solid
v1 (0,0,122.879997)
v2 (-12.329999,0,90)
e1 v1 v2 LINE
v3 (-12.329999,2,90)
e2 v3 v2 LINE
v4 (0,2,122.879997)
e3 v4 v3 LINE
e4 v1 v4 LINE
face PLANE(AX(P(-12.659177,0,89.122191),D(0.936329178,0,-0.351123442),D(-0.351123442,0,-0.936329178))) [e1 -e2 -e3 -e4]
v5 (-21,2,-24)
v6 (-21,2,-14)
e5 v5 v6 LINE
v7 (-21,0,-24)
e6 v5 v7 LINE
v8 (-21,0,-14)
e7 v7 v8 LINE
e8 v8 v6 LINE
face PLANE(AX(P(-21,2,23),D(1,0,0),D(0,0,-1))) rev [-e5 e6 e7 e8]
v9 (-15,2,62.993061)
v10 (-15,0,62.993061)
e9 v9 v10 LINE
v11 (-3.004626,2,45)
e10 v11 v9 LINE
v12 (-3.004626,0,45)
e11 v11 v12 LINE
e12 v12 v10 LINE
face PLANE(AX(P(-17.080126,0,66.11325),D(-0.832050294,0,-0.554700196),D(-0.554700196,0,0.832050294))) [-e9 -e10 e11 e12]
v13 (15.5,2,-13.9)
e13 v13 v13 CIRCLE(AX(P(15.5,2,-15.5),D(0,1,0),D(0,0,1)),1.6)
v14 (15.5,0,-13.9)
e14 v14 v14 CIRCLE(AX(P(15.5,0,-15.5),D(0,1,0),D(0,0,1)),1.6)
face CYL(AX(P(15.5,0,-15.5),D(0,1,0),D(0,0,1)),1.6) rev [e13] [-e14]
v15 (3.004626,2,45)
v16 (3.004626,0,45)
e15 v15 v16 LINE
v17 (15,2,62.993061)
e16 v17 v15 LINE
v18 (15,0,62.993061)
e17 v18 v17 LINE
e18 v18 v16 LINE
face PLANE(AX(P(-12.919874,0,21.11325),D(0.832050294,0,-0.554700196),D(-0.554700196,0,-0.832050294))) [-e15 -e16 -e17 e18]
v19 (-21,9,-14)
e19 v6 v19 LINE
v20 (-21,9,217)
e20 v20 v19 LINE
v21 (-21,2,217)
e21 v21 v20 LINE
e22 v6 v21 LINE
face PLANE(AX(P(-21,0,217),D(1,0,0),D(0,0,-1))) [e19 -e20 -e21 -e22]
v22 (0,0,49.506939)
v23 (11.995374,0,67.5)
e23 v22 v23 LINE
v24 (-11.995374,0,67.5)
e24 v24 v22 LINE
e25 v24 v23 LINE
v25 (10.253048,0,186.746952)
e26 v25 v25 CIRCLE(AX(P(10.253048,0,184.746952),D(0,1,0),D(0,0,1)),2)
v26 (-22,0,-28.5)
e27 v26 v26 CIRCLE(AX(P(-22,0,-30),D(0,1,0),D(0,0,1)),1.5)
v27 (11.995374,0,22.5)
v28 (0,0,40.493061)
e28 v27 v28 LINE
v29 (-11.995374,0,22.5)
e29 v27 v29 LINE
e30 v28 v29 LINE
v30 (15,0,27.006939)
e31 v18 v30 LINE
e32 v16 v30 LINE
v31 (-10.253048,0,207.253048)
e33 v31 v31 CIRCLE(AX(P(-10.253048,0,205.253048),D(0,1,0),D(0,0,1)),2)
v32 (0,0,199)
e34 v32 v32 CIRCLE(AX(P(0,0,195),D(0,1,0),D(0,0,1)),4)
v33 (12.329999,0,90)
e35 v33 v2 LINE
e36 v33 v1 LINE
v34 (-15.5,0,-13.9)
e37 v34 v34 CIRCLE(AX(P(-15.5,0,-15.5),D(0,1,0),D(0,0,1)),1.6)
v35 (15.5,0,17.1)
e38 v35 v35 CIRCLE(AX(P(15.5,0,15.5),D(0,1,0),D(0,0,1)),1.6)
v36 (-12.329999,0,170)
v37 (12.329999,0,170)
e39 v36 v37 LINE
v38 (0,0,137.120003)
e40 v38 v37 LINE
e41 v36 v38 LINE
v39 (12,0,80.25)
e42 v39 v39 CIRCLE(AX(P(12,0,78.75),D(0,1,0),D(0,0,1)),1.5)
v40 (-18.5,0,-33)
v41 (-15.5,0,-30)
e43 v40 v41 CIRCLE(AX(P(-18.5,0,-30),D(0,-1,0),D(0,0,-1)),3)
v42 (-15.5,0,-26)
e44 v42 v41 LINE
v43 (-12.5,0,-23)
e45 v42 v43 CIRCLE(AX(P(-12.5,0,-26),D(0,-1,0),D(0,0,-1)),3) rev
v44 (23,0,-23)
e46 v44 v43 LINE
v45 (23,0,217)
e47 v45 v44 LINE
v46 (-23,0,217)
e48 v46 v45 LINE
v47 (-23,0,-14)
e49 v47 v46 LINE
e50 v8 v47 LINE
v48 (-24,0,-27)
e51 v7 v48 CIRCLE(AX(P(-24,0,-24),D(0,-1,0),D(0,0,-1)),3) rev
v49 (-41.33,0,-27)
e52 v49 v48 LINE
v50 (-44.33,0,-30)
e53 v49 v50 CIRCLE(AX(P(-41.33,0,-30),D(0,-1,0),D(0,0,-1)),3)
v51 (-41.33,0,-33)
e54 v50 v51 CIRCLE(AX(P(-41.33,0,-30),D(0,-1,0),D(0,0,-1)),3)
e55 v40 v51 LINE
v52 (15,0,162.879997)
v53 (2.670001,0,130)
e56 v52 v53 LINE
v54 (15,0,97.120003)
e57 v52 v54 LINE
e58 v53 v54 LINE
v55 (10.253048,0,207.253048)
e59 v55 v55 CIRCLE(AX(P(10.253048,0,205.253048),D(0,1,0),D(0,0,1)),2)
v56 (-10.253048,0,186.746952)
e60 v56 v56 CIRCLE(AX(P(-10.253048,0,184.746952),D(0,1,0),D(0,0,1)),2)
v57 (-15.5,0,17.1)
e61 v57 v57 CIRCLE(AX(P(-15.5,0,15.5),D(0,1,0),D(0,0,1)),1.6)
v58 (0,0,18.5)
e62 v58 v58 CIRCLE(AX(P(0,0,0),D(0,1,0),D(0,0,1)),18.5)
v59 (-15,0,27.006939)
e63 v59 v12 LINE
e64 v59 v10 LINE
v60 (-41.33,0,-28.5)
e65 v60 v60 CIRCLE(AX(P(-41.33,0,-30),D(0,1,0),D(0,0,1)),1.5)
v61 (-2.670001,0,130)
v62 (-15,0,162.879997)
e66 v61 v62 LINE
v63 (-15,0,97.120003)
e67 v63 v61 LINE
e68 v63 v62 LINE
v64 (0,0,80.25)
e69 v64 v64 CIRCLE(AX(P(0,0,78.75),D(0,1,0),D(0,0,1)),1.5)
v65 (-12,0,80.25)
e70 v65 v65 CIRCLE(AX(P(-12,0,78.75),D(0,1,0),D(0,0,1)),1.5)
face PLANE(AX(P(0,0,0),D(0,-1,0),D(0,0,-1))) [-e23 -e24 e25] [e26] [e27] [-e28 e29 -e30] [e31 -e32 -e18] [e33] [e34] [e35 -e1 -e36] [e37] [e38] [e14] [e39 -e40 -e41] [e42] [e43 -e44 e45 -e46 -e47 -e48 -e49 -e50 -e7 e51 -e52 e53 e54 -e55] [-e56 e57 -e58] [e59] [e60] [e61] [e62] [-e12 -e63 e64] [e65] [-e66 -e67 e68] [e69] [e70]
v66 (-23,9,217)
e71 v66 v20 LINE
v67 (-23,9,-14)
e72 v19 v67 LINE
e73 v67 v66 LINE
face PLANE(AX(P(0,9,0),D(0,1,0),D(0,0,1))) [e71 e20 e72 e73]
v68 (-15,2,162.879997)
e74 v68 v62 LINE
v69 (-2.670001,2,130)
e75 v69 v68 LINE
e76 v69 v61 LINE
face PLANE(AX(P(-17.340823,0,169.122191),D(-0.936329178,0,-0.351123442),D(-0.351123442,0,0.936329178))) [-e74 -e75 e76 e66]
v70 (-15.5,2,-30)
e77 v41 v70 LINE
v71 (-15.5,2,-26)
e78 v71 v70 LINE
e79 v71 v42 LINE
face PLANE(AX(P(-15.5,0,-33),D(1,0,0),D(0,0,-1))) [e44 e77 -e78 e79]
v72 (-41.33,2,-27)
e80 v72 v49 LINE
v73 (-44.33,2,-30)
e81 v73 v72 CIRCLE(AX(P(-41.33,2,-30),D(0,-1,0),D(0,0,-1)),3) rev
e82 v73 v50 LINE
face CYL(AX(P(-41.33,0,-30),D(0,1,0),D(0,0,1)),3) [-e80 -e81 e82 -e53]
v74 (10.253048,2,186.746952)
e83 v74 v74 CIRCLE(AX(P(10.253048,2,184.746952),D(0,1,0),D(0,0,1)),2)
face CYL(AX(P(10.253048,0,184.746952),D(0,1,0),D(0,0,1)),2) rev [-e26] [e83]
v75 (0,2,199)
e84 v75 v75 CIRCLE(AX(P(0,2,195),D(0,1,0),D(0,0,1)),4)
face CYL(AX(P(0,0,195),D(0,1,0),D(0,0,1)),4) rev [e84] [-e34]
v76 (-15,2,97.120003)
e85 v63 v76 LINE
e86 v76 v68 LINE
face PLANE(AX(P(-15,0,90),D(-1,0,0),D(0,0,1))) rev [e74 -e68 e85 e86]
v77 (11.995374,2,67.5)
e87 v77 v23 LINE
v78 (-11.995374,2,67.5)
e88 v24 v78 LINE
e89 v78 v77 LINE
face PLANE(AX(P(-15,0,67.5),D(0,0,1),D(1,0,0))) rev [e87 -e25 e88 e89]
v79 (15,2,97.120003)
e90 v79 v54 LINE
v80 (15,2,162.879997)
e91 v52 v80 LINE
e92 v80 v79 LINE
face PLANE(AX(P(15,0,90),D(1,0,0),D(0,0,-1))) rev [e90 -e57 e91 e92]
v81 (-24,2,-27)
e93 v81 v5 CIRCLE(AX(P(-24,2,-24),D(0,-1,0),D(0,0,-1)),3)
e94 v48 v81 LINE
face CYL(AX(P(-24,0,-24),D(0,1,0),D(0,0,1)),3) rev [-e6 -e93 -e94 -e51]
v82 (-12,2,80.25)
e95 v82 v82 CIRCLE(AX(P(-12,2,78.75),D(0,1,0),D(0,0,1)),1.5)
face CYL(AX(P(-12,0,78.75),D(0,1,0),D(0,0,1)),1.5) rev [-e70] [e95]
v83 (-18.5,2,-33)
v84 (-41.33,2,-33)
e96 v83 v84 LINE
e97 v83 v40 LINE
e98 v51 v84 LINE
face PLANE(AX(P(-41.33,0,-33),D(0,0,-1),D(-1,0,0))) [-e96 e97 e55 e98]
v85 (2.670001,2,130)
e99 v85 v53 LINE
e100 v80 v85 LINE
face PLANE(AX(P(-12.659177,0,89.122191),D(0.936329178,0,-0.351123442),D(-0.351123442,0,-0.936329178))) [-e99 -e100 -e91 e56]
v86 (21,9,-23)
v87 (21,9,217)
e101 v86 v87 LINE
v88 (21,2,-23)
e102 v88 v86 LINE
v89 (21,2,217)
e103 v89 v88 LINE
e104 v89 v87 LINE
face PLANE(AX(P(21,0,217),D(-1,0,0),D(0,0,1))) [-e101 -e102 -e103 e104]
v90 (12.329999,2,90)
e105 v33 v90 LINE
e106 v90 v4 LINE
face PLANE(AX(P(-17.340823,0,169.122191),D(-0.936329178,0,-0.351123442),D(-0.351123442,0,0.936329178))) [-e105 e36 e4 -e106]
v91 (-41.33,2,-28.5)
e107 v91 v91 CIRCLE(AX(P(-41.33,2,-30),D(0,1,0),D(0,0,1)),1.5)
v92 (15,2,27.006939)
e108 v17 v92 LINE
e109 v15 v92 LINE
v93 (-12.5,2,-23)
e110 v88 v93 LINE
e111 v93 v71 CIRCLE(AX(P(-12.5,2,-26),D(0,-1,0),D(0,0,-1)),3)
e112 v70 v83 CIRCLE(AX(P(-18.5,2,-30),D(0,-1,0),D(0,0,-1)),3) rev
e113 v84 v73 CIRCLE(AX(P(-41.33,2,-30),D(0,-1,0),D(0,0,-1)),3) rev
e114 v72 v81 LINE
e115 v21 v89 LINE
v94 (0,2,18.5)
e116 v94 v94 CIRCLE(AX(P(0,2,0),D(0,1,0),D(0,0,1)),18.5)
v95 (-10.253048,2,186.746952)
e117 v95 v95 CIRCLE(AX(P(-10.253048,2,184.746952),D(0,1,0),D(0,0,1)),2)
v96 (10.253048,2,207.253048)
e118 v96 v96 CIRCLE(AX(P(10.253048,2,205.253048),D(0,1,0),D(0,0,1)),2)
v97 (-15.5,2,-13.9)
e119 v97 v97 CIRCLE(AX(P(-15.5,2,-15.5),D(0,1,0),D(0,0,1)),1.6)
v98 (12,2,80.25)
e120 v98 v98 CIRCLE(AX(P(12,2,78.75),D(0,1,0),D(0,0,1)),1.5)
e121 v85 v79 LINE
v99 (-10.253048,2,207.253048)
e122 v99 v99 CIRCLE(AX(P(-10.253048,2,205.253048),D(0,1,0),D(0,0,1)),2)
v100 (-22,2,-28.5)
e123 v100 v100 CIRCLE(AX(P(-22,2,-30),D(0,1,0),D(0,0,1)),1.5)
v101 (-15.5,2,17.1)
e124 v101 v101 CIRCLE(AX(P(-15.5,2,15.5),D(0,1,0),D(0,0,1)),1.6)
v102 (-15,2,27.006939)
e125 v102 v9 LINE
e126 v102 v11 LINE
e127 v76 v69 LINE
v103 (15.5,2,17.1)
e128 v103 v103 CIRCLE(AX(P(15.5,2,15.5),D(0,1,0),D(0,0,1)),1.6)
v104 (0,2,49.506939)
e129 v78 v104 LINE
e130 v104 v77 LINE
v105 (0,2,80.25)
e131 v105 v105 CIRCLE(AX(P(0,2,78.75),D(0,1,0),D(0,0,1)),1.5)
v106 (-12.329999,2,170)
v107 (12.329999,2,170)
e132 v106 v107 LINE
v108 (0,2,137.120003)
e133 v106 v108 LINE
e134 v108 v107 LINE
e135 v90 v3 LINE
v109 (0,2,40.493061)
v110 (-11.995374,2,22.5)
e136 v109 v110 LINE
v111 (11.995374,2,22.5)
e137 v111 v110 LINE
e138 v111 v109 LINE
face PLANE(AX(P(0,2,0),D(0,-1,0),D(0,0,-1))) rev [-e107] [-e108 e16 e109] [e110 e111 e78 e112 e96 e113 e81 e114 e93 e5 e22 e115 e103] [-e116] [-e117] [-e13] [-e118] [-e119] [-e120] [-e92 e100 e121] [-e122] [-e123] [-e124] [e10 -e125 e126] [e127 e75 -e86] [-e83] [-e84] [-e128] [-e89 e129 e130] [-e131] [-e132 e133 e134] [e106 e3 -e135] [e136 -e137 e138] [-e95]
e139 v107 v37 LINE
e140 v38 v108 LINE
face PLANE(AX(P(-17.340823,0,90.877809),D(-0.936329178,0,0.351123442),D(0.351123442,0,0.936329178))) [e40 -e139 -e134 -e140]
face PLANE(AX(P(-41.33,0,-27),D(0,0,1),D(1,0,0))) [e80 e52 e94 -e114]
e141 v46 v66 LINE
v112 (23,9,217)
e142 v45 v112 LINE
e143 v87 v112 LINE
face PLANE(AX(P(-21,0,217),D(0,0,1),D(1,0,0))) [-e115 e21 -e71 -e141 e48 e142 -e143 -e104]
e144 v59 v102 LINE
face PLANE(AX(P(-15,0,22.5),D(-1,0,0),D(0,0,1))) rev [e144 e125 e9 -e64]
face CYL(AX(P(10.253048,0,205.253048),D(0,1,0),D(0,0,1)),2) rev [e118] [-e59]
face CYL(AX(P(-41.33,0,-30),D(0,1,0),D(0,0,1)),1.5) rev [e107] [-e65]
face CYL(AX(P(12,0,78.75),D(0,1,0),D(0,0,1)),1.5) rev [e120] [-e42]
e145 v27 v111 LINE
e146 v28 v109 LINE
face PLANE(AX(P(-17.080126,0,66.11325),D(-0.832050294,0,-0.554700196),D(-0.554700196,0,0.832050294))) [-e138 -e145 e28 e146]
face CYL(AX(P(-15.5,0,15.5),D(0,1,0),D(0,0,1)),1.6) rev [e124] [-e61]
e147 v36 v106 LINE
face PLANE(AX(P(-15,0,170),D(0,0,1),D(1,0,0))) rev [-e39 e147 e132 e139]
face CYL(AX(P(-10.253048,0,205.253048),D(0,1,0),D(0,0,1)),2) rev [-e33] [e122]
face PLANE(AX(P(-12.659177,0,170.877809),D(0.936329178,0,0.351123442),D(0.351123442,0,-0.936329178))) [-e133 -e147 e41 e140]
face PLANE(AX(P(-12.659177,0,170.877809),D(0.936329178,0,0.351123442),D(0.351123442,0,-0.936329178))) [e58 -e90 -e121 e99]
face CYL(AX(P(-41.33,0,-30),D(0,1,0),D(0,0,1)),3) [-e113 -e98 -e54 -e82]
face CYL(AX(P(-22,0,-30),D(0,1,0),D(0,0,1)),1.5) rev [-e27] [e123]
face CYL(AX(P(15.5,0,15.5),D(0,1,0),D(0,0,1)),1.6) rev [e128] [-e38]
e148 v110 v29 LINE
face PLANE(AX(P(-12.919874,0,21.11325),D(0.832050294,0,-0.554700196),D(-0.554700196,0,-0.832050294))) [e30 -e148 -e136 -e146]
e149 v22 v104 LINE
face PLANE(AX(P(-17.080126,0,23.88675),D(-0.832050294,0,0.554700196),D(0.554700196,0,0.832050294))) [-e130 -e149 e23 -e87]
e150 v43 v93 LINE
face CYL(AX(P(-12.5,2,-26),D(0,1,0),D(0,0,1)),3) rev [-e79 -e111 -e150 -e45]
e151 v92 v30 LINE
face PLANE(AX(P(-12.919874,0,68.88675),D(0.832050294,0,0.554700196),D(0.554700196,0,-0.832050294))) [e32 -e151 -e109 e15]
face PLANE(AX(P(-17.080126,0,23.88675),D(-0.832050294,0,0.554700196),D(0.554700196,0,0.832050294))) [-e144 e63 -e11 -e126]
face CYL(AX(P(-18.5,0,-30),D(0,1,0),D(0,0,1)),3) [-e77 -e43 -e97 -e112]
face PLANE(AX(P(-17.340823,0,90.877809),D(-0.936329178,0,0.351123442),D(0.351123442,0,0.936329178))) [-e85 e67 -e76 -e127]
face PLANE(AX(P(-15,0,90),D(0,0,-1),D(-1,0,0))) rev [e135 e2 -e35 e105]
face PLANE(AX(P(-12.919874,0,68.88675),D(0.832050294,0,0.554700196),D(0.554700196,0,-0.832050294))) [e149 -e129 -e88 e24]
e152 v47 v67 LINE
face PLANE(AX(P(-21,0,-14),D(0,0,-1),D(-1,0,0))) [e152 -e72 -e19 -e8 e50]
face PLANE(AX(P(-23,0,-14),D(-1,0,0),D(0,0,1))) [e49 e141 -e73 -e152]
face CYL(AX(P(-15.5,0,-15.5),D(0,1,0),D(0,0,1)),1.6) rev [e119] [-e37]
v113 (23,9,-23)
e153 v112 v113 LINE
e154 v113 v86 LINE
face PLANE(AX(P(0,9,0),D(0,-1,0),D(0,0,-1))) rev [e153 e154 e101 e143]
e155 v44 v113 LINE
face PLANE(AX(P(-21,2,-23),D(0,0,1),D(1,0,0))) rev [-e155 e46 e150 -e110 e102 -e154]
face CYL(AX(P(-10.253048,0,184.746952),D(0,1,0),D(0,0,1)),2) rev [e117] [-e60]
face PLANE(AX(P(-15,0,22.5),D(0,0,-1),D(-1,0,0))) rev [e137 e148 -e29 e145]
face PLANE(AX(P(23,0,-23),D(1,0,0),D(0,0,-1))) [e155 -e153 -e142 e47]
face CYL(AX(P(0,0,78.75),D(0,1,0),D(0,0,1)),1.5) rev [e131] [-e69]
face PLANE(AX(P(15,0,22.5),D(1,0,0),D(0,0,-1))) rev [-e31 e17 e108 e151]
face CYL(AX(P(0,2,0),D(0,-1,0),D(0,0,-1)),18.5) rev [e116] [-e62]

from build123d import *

# Parameters (mm, degrees)
SKETCH_2_W           = 42
SKETCH_2_H           = 46
SKETCH_2_R           = 18.5
EXTRUDE_1_DEPTH      = 2
FILLET_1_R           = 5.5
SKETCH_3_R           = 1.6
CUT_EXTRUDE_1_DEPTH  = 32.208973069
SKETCH_4_R           = 4
SKETCH_4_R_2         = 2
EXTRUDE_2_DEPTH      = 2
SKETCH_7_R           = 1.5
EXTRUDE_4_DEPTH      = 2
EXTRUDE_5_DEPTH      = 7
EXTRUDE_5_DEPTH_BACK = 2
SKETCH_9_W           = 2
SKETCH_9_H           = 231
SKETCH_9_H_2         = 240
SKETCH_12_W          = 30
SKETCH_12_H          = 45
SKETCH_12_H_2        = 80
CUT_EXTRUDE_4_DEPTH  = 222.592303341
EXTRUDE_6_DEPTH      = 2
EXTRUDE_7_DEPTH      = 2
FILLET_2_R           = 3
SKETCH_15_R          = 1.5
CUT_EXTRUDE_5_DEPTH  = 222.592303341


with BuildPart() as part:
    # 草图2 → 凸台-拉伸1 (new body)
    with BuildSketch(Plane(origin=(0, 0, 0), x_dir=(1, 0, 0), z_dir=(0, 1, 0))):
        Rectangle(SKETCH_2_W, SKETCH_2_H)
        with Locations(Location((0, 0, 0), (0, 0, 270))):
            Circle(SKETCH_2_R, mode=Mode.SUBTRACT)
    extrude(amount=EXTRUDE_1_DEPTH)

    # 圆角1
    fillet_1_edges = [part.edges().sort_by_distance(p)[0] for p in [
        (-21, 1, -23),
    ]]
    fillet(fillet_1_edges, radius=FILLET_1_R)

    # 草图3 → 切除-拉伸1 (cut, through all)
    with BuildSketch(Plane(origin=(0, 2, 0), x_dir=(1, 0, 0), z_dir=(0, 1, 0))):
        with Locations(Location((-15.5, 15.5, 0), (0, 0, 270))):
            Circle(SKETCH_3_R)
        with Locations(Location((15.5, 15.5, 0), (0, 0, 270))):
            Circle(SKETCH_3_R)
        with Locations(Location((-15.5, -15.5, 0), (0, 0, 270))):
            Circle(SKETCH_3_R)
        with Locations(Location((15.5, -15.5, 0), (0, 0, 270))):
            Circle(SKETCH_3_R)
    extrude(amount=-CUT_EXTRUDE_1_DEPTH, mode=Mode.SUBTRACT)

    # 草图4 → 凸台-拉伸2 (add)
    with BuildSketch(Plane(origin=(0, 2, 0), x_dir=(1, 0, 0), z_dir=(0, 1, 0))):
        Polygon((-21, -23), (21, -23), (21, -176), (21, -217), (-21, -217), (-21, -176), align=None)
        with Locations(Location((0, -195, 0), (0, 0, 270))):
            Circle(SKETCH_4_R, mode=Mode.SUBTRACT)
        with Locations(Location((10.253048327, -184.746951673, 0), (0, 0, 270))):
            Circle(SKETCH_4_R_2, mode=Mode.SUBTRACT)
        with Locations(Location((-10.253048327, -184.746951673, 0), (0, 0, 270))):
            Circle(SKETCH_4_R_2, mode=Mode.SUBTRACT)
        with Locations(Location((10.253048327, -205.253048327, 0), (0, 0, 270))):
            Circle(SKETCH_4_R_2, mode=Mode.SUBTRACT)
        with Locations(Location((-10.253048327, -205.253048327, 0), (0, 0, 270))):
            Circle(SKETCH_4_R_2, mode=Mode.SUBTRACT)
    extrude(amount=-EXTRUDE_2_DEPTH)

    # 草图7 → 凸台-拉伸4 (add)
    with BuildSketch(Plane(origin=(0, 2, 0), x_dir=(1, 0, 0), z_dir=(0, 1, 0))):
        Polygon((-15.5, 23), (-21, 17), (-21, 27), (-41.33, 27), (-44.33, 27), (-44.33, 33), (-41.33, 33), (-15.5, 33), align=None)
        with Locations(Location((-41.33, 30, 0), (0, 0, 270))):
            Circle(SKETCH_7_R, mode=Mode.SUBTRACT)
        with Locations(Location((-22, 30, 0), (0, 0, 270))):
            Circle(SKETCH_7_R, mode=Mode.SUBTRACT)
    extrude(amount=-EXTRUDE_4_DEPTH)

    # 草图9 → 凸台-拉伸5 (add, two sides: drawn at the far end of the back side and taken through both)
    with BuildSketch(Plane(origin=(0, 2, 0), x_dir=(1, 0, 0), z_dir=(0, 1, 0)).offset(-EXTRUDE_5_DEPTH_BACK)):
        with Locations((-22, -101.5)):
            Rectangle(SKETCH_9_W, SKETCH_9_H)
        with Locations((22, -97)):
            Rectangle(SKETCH_9_W, SKETCH_9_H_2)
    extrude(amount=EXTRUDE_5_DEPTH + EXTRUDE_5_DEPTH_BACK)

    # 草图12 → 切除-拉伸4 (cut, through all)
    with BuildSketch(Plane(origin=(0, 2, 0), x_dir=(1, 0, 0), z_dir=(0, 1, 0))):
        with Locations((0, -45)):
            Rectangle(SKETCH_12_W, SKETCH_12_H)
        with Locations((0, -130)):
            Rectangle(SKETCH_12_W, SKETCH_12_H_2)
    extrude(amount=-CUT_EXTRUDE_4_DEPTH, mode=Mode.SUBTRACT)

    # 草图13 → 凸台-拉伸6 (add)
    with BuildSketch(Plane(origin=(0, 2, 0), x_dir=(1, 0, 0), z_dir=(0, 1, 0))):
        Polygon((-17.080125736, -23.886750491), (12.919874264, -68.886750491), (17.080125736, -66.113249509), (-12.919874264, -21.113249509), align=None)
        Polygon((-17.340822944, -90.877808604), (12.659177056, -170.877808604), (17.340822944, -169.122191396), (-12.659177056, -89.122191396), align=None)
    extrude(amount=-EXTRUDE_6_DEPTH)

    # 草图14 → 凸台-拉伸7 (add)
    with BuildSketch(Plane(origin=(0, 2, 0), x_dir=(1, 0, 0), z_dir=(0, 1, 0))):
        Polygon((-17.080125736, -66.113249509), (12.919874264, -21.113249509), (17.080125736, -23.886750491), (-12.919874264, -68.886750491), align=None)
        Polygon((-17.340822944, -169.122191396), (12.659177056, -89.122191396), (17.340822944, -90.877808604), (-12.659177056, -170.877808604), align=None)
    extrude(amount=-EXTRUDE_7_DEPTH)

    # 圆角2
    fillet_2_edges = [part.edges().sort_by_distance(p)[0] for p in [
        (-15.5, 1, -23),
        (-15.5, 1, -33),
        (-21, 1, -27),
        (-44.33, 1, -27),
        (-44.33, 1, -33),
    ]]
    fillet(fillet_2_edges, radius=FILLET_2_R - 0.0001)  # a hair under: the kernel refuses the full size

    # 草图15 → 切除-拉伸5 (cut, through all)
    with BuildSketch(Plane(origin=(0, 2, 0), x_dir=(1, 0, 0), z_dir=(0, 1, 0))):
        with Locations(Location((0, -78.75, 0), (0, 0, 270))):
            Circle(SKETCH_15_R)
        with Locations(Location((12, -78.75, 0), (0, 0, 270))):
            Circle(SKETCH_15_R)
        with Locations(Location((-12, -78.75, 0), (0, 0, 270))):
            Circle(SKETCH_15_R)
    extrude(amount=-CUT_EXTRUDE_5_DEPTH, mode=Mode.SUBTRACT)


solid = part.part
